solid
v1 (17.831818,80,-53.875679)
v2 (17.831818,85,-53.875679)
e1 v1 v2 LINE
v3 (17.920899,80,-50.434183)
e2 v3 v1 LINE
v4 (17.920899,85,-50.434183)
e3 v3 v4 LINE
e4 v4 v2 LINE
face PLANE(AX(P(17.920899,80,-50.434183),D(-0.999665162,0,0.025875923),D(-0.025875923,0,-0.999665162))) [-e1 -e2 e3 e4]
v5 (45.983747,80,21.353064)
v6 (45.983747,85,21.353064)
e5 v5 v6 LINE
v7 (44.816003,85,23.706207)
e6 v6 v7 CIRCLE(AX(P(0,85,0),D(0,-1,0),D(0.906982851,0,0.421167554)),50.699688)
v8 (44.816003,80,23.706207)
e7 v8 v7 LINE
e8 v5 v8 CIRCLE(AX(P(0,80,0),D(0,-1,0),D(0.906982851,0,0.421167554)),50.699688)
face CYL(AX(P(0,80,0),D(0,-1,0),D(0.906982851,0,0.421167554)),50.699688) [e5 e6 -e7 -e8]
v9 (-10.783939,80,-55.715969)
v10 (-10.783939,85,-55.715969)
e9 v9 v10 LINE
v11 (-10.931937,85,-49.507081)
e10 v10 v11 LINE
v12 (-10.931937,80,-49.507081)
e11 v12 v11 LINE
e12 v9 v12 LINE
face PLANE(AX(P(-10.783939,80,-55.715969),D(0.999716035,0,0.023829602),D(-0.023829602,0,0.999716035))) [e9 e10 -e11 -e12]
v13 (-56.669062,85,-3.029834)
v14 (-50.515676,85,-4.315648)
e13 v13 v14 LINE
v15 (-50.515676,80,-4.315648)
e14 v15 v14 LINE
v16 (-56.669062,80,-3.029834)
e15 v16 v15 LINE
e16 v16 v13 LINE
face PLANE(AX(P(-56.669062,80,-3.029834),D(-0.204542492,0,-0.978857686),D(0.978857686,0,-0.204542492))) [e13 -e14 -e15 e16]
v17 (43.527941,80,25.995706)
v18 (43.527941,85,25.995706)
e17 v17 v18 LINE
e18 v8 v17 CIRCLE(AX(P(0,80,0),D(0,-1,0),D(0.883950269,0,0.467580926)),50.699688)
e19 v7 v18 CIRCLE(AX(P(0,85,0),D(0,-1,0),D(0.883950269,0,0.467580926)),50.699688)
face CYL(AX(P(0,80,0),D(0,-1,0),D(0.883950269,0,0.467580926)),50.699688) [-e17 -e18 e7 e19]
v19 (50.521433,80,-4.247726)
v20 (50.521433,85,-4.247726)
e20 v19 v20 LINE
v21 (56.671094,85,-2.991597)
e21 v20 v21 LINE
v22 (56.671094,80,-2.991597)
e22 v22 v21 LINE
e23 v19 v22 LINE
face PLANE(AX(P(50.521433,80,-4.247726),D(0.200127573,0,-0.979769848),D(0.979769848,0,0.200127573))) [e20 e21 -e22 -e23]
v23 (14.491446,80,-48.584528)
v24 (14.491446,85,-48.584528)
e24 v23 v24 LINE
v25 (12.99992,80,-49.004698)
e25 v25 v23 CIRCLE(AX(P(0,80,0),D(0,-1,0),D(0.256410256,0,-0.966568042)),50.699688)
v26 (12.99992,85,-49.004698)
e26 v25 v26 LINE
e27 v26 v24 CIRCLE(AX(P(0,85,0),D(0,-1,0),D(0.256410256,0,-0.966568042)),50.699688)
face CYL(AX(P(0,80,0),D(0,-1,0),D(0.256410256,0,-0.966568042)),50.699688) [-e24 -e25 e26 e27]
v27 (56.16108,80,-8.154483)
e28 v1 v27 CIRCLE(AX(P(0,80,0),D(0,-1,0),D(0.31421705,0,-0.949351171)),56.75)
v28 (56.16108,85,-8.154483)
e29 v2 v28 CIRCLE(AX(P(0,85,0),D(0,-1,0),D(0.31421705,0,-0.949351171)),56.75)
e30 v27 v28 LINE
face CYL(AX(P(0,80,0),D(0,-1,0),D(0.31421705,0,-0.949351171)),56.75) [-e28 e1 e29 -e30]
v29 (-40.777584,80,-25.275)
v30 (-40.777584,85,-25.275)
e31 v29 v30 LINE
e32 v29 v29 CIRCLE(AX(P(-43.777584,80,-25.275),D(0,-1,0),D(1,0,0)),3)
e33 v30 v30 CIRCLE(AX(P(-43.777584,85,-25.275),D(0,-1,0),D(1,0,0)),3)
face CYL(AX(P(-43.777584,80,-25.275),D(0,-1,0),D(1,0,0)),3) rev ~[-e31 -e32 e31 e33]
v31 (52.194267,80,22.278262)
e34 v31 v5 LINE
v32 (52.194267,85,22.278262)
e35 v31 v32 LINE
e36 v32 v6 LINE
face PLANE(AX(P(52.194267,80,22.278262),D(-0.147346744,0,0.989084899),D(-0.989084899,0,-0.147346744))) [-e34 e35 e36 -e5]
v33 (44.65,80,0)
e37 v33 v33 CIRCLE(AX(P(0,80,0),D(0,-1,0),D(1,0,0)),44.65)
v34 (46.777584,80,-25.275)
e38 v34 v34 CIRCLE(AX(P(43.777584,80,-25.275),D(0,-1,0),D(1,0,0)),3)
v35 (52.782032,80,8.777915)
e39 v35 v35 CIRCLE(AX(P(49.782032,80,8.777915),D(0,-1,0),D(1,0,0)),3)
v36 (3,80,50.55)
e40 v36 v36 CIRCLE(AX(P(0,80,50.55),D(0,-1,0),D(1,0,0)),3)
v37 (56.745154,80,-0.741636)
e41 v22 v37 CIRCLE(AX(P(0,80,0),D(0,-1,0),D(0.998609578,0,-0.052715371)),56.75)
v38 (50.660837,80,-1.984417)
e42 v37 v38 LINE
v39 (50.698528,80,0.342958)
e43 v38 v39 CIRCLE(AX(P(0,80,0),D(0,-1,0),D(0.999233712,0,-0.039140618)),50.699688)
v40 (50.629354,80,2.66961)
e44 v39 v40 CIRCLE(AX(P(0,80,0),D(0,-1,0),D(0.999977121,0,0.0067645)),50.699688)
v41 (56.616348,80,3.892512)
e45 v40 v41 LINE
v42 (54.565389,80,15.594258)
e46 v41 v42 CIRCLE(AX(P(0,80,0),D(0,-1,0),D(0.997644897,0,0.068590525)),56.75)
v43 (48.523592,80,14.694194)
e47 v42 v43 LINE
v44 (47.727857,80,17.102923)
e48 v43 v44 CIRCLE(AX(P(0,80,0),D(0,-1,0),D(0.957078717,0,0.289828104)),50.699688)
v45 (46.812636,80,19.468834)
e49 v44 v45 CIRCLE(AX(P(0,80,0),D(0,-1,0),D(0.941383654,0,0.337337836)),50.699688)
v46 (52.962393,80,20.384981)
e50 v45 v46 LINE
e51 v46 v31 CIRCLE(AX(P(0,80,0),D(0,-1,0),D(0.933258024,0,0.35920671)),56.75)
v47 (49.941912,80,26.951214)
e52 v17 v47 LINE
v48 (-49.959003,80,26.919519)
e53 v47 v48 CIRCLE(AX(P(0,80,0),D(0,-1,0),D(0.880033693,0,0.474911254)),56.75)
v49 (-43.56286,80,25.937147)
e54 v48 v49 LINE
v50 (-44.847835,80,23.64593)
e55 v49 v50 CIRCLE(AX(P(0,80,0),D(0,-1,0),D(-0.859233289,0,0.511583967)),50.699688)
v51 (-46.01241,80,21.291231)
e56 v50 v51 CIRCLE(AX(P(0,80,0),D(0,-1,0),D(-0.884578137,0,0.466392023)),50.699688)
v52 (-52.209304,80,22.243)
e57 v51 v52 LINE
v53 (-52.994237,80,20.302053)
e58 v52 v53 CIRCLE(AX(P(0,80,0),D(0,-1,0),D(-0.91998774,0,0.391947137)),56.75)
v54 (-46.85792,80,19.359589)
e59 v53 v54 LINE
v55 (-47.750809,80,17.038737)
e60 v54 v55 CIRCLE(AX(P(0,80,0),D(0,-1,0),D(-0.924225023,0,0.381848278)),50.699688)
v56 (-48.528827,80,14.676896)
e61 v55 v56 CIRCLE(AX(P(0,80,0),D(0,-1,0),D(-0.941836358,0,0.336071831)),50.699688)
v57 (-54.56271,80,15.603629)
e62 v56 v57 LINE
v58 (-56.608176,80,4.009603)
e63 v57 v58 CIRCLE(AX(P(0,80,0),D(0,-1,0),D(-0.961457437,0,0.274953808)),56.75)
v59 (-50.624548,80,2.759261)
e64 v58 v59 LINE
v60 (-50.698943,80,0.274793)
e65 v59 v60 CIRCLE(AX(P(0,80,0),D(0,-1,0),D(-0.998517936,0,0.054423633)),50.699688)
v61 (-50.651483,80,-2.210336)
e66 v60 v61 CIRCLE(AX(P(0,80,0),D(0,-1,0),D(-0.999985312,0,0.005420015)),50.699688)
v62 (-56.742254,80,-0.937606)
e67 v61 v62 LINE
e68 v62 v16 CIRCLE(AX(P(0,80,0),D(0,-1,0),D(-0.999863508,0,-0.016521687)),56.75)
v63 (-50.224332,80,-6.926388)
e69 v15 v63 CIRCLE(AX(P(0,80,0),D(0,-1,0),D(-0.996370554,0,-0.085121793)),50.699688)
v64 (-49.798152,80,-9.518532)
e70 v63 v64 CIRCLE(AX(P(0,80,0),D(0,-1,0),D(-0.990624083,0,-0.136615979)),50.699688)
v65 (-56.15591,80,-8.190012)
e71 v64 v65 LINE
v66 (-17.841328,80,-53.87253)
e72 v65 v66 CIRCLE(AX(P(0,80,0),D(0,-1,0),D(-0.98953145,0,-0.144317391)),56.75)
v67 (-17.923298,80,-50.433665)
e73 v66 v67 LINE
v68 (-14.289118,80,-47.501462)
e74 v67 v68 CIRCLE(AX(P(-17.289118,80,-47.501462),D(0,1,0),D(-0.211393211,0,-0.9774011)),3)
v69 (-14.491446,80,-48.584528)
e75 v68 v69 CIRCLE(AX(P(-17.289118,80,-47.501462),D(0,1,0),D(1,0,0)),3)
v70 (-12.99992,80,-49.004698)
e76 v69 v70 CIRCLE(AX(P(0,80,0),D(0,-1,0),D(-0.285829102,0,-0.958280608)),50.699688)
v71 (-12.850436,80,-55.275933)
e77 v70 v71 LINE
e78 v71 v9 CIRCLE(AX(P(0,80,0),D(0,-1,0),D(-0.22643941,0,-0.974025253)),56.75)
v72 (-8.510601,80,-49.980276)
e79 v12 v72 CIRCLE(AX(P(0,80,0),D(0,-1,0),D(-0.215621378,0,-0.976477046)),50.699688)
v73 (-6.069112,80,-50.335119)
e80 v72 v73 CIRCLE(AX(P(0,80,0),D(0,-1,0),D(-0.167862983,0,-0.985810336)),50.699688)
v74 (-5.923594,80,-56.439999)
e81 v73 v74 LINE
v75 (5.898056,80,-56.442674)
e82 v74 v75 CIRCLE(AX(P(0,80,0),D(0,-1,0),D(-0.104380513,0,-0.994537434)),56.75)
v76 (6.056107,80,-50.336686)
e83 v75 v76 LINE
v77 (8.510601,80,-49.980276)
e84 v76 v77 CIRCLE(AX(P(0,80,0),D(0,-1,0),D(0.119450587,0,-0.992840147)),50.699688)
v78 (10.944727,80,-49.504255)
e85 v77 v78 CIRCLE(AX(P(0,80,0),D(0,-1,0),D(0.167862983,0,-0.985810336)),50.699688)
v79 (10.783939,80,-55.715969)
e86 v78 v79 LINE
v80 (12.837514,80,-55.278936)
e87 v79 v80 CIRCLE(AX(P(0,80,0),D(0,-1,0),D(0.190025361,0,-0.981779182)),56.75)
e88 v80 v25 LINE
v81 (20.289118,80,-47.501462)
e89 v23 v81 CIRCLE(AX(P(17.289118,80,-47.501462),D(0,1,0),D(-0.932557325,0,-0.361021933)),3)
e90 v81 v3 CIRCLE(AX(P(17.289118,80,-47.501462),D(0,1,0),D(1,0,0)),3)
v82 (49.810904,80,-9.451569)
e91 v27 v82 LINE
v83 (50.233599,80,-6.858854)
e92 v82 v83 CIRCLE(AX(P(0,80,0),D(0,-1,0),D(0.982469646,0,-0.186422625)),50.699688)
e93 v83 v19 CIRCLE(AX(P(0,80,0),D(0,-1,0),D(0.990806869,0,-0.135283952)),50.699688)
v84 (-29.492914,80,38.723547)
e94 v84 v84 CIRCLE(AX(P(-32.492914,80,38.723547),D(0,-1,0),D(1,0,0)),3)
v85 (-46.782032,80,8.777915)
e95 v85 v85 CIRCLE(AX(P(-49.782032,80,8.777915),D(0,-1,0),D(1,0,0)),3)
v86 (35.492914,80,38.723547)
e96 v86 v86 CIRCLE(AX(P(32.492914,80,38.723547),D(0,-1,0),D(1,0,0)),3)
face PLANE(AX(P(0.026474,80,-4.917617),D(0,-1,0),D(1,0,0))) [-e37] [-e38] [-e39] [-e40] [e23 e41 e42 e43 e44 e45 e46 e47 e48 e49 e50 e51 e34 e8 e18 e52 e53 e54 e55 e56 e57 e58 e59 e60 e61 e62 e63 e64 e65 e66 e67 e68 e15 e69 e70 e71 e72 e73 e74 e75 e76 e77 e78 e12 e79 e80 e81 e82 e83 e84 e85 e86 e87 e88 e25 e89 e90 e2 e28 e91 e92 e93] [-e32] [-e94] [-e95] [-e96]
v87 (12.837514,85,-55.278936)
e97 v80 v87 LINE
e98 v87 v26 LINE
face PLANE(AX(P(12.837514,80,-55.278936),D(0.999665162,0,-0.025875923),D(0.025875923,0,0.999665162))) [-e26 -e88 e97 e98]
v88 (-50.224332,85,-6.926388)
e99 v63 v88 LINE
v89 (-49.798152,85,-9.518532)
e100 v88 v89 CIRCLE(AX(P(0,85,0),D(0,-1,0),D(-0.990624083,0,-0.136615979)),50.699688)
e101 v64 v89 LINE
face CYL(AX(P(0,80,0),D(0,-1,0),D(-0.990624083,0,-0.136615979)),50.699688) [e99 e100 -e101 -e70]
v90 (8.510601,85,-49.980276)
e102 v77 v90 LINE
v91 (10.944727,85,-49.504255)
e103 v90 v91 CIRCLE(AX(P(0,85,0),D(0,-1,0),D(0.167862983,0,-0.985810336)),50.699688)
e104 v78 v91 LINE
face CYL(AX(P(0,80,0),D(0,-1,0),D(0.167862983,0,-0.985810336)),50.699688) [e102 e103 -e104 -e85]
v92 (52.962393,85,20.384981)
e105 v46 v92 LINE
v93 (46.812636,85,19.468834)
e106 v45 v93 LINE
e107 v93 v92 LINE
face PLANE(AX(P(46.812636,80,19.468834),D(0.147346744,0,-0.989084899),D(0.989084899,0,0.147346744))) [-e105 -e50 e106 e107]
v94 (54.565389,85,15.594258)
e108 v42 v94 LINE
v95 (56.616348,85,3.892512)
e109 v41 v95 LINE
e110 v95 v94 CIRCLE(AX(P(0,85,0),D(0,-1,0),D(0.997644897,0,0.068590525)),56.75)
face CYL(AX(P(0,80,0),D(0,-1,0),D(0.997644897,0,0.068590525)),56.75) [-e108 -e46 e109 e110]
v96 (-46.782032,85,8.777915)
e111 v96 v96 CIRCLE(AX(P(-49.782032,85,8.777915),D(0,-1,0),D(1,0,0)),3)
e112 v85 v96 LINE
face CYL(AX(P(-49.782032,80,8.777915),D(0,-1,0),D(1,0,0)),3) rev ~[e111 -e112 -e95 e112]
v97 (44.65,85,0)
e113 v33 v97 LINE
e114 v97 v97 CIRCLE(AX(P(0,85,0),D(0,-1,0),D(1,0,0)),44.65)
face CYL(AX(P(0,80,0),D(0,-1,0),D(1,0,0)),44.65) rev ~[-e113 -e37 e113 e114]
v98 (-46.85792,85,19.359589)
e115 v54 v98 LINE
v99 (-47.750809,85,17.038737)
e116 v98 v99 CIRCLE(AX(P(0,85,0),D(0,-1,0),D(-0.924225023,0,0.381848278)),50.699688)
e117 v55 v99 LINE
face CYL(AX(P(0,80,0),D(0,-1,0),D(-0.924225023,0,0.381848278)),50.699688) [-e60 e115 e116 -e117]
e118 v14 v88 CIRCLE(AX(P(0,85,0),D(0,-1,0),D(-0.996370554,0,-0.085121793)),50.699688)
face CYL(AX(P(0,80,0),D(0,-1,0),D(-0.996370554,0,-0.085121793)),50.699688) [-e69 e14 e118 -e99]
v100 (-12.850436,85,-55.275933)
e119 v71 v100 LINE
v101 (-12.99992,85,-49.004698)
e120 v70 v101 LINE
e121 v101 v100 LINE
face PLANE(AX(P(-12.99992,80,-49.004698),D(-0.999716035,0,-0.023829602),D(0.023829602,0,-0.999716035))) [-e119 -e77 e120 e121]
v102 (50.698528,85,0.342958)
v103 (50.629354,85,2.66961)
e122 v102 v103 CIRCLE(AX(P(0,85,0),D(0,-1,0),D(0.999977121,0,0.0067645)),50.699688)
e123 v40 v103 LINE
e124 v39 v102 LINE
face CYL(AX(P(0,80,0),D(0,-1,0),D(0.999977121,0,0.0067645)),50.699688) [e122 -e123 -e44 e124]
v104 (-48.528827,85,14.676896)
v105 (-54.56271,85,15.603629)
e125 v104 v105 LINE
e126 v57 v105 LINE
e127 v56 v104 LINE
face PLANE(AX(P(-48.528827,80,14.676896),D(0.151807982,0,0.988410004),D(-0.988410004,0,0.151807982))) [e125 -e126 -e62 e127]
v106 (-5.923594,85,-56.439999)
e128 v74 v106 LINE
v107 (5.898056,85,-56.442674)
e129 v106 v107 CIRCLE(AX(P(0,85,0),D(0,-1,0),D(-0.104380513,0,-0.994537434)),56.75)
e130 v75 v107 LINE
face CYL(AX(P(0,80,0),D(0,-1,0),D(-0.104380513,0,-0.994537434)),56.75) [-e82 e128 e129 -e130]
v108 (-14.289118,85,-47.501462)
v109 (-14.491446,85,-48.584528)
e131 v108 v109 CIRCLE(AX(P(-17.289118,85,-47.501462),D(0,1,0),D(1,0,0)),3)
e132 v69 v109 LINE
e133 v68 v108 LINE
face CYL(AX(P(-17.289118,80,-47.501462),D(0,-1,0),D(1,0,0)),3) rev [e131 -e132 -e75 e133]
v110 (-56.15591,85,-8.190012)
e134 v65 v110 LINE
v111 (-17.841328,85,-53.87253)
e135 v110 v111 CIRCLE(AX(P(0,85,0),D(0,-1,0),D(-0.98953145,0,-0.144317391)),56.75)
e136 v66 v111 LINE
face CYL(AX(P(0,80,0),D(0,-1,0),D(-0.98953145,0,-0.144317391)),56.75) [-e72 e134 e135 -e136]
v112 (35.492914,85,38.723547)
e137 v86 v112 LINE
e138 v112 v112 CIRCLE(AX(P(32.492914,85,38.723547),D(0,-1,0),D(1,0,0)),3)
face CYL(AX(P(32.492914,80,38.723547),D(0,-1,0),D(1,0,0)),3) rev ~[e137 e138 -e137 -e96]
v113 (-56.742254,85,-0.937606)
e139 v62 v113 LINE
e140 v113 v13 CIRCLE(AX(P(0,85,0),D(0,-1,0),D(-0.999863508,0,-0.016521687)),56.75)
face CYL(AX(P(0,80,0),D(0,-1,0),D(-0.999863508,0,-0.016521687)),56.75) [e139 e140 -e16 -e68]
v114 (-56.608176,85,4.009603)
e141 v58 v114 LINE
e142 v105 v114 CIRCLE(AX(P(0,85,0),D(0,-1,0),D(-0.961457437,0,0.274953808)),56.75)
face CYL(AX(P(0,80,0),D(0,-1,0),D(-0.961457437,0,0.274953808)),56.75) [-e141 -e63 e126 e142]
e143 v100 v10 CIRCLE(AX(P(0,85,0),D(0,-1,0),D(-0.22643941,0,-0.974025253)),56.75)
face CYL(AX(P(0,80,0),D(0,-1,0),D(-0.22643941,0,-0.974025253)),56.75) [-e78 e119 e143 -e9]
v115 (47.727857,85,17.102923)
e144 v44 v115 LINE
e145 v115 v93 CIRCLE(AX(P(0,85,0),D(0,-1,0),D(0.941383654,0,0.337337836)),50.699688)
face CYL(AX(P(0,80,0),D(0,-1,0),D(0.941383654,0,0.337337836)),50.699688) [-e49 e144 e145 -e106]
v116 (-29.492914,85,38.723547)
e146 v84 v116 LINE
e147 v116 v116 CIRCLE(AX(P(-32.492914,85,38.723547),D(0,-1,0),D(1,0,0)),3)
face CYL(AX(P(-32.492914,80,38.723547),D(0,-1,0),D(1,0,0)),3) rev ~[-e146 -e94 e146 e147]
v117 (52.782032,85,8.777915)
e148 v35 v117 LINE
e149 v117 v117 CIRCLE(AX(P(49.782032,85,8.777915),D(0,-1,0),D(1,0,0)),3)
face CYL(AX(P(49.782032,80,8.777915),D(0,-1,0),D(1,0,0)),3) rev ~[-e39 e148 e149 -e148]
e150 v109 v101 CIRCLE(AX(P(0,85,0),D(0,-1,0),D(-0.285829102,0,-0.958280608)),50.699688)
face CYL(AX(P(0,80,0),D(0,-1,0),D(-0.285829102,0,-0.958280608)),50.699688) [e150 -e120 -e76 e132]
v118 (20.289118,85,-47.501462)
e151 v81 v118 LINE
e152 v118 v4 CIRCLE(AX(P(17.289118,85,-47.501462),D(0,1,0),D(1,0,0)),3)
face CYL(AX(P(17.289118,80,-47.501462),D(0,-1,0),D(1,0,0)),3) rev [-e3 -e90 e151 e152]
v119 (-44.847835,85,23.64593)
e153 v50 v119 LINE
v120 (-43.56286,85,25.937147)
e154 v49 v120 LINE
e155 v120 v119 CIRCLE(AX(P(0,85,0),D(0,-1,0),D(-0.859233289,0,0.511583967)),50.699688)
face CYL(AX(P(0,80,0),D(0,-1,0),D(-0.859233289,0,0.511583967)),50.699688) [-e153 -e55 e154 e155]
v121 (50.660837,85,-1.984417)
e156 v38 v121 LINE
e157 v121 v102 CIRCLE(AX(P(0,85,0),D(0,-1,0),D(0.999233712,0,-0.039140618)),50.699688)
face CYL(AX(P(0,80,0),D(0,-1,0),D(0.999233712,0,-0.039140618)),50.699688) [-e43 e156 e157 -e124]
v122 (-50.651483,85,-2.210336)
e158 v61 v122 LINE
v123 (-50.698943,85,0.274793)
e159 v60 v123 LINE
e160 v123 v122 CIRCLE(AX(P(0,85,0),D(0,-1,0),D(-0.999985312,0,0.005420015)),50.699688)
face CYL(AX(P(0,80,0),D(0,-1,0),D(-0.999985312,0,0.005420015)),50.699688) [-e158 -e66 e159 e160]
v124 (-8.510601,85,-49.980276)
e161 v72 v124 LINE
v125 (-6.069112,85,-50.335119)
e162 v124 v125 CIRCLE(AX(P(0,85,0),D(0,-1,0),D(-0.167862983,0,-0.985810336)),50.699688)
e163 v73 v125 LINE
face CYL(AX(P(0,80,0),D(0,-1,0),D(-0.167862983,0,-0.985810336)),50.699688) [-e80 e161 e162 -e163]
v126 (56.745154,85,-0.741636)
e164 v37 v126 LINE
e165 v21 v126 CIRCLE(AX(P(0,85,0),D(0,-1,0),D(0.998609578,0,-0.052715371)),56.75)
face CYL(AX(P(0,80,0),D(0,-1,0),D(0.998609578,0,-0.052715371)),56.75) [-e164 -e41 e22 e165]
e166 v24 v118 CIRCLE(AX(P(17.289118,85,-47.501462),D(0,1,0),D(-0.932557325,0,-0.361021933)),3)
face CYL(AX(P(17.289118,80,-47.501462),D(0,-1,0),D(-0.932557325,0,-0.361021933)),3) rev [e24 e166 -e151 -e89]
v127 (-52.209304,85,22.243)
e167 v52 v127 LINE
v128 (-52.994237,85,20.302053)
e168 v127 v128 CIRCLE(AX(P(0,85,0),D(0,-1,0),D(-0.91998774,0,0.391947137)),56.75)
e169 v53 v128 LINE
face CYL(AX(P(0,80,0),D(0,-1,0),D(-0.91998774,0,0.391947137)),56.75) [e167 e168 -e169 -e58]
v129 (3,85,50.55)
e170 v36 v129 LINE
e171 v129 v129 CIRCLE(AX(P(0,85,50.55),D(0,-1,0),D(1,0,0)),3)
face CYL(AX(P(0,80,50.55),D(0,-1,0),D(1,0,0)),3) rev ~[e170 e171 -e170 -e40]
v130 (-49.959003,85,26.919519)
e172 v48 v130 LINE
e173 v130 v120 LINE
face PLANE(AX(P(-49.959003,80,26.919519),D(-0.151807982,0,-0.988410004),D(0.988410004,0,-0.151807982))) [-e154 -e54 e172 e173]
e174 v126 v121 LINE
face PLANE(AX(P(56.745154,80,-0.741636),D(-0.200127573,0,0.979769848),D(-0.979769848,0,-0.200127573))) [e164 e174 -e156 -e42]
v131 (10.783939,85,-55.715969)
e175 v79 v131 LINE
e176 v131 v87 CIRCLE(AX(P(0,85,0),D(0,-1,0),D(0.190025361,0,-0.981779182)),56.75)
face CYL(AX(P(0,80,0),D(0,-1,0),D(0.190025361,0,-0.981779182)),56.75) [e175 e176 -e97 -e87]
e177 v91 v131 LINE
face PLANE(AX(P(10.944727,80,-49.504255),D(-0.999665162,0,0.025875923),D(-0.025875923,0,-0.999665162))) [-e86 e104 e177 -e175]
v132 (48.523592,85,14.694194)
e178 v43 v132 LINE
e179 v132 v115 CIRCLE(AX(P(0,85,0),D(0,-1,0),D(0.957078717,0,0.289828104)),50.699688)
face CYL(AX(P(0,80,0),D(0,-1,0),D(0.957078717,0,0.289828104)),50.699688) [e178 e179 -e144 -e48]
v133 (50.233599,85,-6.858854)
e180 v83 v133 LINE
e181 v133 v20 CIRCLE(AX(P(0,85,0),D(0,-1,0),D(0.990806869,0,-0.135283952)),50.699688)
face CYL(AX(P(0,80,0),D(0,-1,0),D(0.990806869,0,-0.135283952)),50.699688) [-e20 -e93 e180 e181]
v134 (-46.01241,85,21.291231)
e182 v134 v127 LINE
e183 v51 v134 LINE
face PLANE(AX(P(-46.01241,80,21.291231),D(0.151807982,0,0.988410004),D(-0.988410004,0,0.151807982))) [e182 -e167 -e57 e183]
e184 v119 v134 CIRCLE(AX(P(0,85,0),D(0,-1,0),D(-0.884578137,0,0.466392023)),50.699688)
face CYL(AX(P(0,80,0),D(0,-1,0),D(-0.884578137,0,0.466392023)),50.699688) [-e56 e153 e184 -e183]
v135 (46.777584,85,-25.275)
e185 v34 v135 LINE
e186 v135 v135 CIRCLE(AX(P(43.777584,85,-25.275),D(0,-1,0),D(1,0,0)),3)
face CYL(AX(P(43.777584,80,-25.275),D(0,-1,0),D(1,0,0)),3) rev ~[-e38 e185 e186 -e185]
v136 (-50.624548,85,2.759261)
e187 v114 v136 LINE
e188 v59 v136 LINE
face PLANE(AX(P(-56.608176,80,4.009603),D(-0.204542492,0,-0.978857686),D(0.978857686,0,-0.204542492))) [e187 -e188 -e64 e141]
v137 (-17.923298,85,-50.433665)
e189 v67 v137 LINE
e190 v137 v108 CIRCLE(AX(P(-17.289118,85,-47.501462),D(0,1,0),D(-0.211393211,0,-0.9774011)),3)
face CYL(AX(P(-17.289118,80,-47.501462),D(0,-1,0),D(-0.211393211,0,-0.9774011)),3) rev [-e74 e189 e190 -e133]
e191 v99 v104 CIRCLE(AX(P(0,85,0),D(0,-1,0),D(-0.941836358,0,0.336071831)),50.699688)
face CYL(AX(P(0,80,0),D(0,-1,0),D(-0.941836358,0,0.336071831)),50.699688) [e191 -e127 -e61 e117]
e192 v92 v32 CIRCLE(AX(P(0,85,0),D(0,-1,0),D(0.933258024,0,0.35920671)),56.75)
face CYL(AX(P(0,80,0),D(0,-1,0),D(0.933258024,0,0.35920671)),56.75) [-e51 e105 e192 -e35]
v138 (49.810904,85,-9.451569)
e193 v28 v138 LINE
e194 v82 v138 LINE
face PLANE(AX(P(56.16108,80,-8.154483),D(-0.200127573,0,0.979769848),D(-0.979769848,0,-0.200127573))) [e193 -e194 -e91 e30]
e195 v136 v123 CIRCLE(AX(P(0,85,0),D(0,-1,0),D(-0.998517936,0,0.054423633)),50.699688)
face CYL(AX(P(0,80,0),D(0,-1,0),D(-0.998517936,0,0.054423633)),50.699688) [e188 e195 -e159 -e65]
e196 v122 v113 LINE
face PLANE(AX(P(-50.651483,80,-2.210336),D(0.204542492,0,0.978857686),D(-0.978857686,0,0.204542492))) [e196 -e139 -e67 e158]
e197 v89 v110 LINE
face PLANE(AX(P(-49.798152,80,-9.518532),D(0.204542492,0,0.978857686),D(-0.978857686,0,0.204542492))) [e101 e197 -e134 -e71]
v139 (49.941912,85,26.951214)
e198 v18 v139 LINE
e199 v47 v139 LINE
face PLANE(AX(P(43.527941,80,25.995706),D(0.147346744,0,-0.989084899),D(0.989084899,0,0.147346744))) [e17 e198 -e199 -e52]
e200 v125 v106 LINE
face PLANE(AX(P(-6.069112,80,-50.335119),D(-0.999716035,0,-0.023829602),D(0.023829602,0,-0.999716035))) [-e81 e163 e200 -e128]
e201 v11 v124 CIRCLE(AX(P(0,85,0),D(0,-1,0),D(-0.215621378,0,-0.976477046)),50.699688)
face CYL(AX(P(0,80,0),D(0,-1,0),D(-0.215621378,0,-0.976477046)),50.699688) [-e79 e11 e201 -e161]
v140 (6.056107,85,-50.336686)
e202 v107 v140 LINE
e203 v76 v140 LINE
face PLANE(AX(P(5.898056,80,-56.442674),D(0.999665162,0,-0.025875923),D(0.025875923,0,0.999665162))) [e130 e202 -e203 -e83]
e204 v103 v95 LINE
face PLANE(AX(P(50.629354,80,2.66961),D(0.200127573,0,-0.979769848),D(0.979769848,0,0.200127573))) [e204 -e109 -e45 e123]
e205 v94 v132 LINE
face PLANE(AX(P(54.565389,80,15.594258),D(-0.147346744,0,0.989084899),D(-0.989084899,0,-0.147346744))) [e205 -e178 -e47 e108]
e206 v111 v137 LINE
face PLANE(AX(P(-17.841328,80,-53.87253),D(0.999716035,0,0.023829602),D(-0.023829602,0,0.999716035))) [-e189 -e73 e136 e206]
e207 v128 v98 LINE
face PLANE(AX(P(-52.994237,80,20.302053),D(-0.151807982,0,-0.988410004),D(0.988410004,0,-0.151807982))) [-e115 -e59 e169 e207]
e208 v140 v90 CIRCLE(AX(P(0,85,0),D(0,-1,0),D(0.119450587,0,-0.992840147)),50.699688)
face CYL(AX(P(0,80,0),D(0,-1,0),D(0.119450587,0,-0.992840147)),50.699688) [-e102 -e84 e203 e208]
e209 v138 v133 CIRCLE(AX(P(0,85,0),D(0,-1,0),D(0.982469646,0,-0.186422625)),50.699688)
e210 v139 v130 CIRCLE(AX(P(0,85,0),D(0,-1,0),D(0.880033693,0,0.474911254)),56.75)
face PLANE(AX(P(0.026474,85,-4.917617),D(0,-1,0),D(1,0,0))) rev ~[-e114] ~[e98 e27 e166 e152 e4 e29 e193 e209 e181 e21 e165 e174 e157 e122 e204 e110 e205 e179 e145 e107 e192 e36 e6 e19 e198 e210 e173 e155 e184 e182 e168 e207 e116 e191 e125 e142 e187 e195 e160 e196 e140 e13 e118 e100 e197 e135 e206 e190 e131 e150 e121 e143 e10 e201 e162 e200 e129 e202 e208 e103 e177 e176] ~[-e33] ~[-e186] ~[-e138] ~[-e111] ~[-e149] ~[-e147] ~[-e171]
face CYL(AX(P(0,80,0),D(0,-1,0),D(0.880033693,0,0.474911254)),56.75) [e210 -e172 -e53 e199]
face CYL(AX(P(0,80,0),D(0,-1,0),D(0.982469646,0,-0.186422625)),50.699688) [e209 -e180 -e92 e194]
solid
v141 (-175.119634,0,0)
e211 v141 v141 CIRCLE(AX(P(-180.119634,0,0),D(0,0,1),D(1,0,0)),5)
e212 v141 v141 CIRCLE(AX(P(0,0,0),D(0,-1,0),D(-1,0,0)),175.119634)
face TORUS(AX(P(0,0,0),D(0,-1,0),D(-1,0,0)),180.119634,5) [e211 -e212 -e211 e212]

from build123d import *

# Parameters (mm, degrees)
F1_R     = 5
F3_START = -80
F0_R     = 3
F0_R_2   = 44.65
F3_DEPTH = 5


# Not quite as in the source:
# - the program builds the solid bodies; features that only make, move or delete a surface that nothing else refers to are left out


with BuildPart() as f2:
    # F1 (on Top) → F2 (revolve)
    with BuildSketch(Plane.XY):
        with Locations((-180.1196336746, 0)):
            Circle(F1_R)
    revolve(axis=Axis((0, 0, 0), (0, -1, 0)))


with BuildPart() as f3:
    # F0 (on Front) → F3 (new body)
    with BuildSketch(Plane.XZ.offset(F3_START)):
        with BuildLine():
            ThreePointArc((49.8109044328, -9.451568881), (50.0390468759, -8.1579496494), (50.2335990607, -6.8588541417))
            ThreePointArc((50.2335990607, -6.8588541417), (50.3944303881, -5.5551544159), (50.5214328951, -4.247725621))
            Line((50.5214328951, -4.247725621), (56.6710935634, -2.9915972871))
            ThreePointArc((56.6710935634, -2.9915972871), (56.7192812989, -1.8669839158), (56.7451537669, -0.7416360104))
            Line((56.7451537669, -0.7416360104), (50.6608373732, -1.9844171372))
            ThreePointArc((50.6608373732, -1.9844171372), (50.6930409681, -0.8209458797), (50.6985279324, 0.342958039))
            ThreePointArc((50.6985279324, 0.342958039), (50.6772953744, 1.5066812093), (50.6293544842, 2.669610317))
            Line((50.6293544842, 2.669610317), (56.6163478884, 3.8925122714))
            ThreePointArc((56.6163478884, 3.8925122714), (55.8979189272, 9.7972016216), (54.5653885403, 15.5942577074))
            Line((54.5653885403, 15.5942577074), (48.5235922547, 14.6941944125))
            ThreePointArc((48.5235922547, 14.6941944125), (48.1407923431, 15.9035363146), (47.7278574814, 17.1029229947))
            ThreePointArc((47.7278574814, 17.1029229947), (47.2850461567, 18.2916036663), (46.812635558, 19.4688342447))
            Line((46.812635558, 19.4688342447), (52.962392865, 20.384980795))
            ThreePointArc((52.962392865, 20.384980795), (52.5868512377, 21.3350785541), (52.1942673065, 22.2782620583))
            Line((52.1942673065, 22.2782620583), (45.9837474764, 21.353063545))
            ThreePointArc((45.9837474764, 21.353063545), (45.4151184326, 22.537199748), (44.8160027703, 23.7062070021))
            ThreePointArc((44.8160027703, 23.7062070021), (44.1868026685, 24.8593005667), (43.5279405017, 25.9957063842))
            Line((43.5279405017, 25.9957063842), (49.9419120736, 26.9512136727))
            ThreePointArc((49.9419120736, 26.9512136727), (-0.0180046804, 56.7499971439), (-49.9590032696, 26.9195187979))
            Line((-49.9590032696, 26.9195187979), (-43.5628595995, 25.9371474577))
            ThreePointArc((-43.5628595995, 25.9371474577), (-44.2201896339, 24.7998625696), (-44.847835498, 23.6459300066))
            ThreePointArc((-44.847835498, 23.6459300066), (-45.4453758651, 22.4761243815), (-46.0124096177, 21.2912309626))
            Line((-46.0124096177, 21.2912309626), (-52.2093042453, 22.2430000275))
            ThreePointArc((-52.2093042453, 22.2430000275), (-52.6107220584, 21.2761468431), (-52.9942367056, 20.3020534921))
            Line((-52.9942367056, 20.3020534921), (-46.8579202223, 19.3595885072))
            ThreePointArc((-46.8579202223, 19.3595885072), (-47.3185959, 18.2046377822), (-47.7508093952, 17.0387369495))
            ThreePointArc((-47.7508093952, 17.0387369495), (-48.154300731, 15.8625872996), (-48.5288272071, 14.6768962876))
            Line((-48.5288272071, 14.6768962876), (-54.5627095565, 15.6036286119))
            ThreePointArc((-54.5627095565, 15.6036286119), (-55.8869108783, 9.8598018482), (-56.6081759757, 4.0096025617))
            Line((-56.6081759757, 4.0096025617), (-50.6245477239, 2.7592612205))
            ThreePointArc((-50.6245477239, 2.7592612205), (-50.6769730719, 1.517483112), (-50.6989432189, 0.2747930459))
            ThreePointArc((-50.6989432189, 0.2747930459), (-50.6904449614, -0.9680621618), (-50.6514834065, -2.2103355958))
            Line((-50.6514834065, -2.2103355958), (-56.7422540571, -0.9376057363))
            ThreePointArc((-56.7422540571, -0.9376057363), (-56.7153067125, -1.9840575867), (-56.669062139, -3.029834367))
            Line((-56.669062139, -3.029834367), (-50.5156761211, -4.3156483586))
            ThreePointArc((-50.5156761211, -4.3156483586), (-50.3869158777, -5.6229052157), (-50.2243318582, -6.9263875238))
            ThreePointArc((-50.2243318582, -6.9263875238), (-50.0280332022, -8.2252202799), (-49.7981516812, -9.5185316024))
            Line((-49.7981516812, -9.5185316024), (-56.1559097911, -8.1900119371))
            ThreePointArc((-56.1559097911, -8.1900119371), (-43.4812708484, -36.4683641723), (-17.8413278177, -53.8725303072))
            Line((-17.8413278177, -53.8725303072), (-17.9232978779, -50.4336652809))
            ThreePointArc((-17.9232978779, -50.4336652809), (-19.1729257063, -45.1666666044), (-14.2891182451, -47.5014619807))
            ThreePointArc((-14.2891182451, -47.5014619807), (-14.3401340199, -48.0523630966), (-14.4914462714, -48.5845277809))
            ThreePointArc((-14.4914462714, -48.5845277809), (-13.7472884724, -48.8003116218), (-12.9999199783, -49.004698094))
            Line((-12.9999199783, -49.004698094), (-12.8504364982, -55.2759331157))
            ThreePointArc((-12.8504364982, -55.2759331157), (-11.8192358816, -55.5055687582), (-10.7839392307, -55.7159685788))
            Line((-10.7839392307, -55.7159685788), (-10.9319365624, -49.5070814907))
            ThreePointArc((-10.9319365624, -49.5070814907), (-9.7241474559, -49.7584094499), (-8.5106008637, -49.9802763865))
            ThreePointArc((-8.5106008637, -49.9802763865), (-7.2920153041, -50.1725509371), (-6.0691122787, -50.3351192596))
            Line((-6.0691122787, -50.3351192596), (-5.9235940949, -56.4399994064))
            ThreePointArc((-5.9235940949, -56.4399994064), (-0.0128386472, -56.7499985477), (5.8980564587, -56.4426738382))
            Line((5.8980564587, -56.4426738382), (6.0561074621, -50.3366855994))
            ThreePointArc((6.0561074621, -50.3366855994), (7.2855339368, -50.1734925034), (8.5106008637, -49.9802763865))
            ThreePointArc((8.5106008637, -49.9802763865), (9.7305751823, -49.7571528662), (10.9447268793, -49.5042554561))
            Line((10.9447268793, -49.5042554561), (10.7839392307, -55.7159685788))
            ThreePointArc((10.7839392307, -55.7159685788), (11.8127478396, -55.5069499115), (12.837513908, -55.278935741))
            Line((12.837513908, -55.278935741), (12.9999199783, -49.004698094))
            ThreePointArc((12.9999199783, -49.004698094), (13.7472884724, -48.8003116218), (14.4914462714, -48.5845277809))
            ThreePointArc((14.4914462714, -48.5845277809), (16.7382171293, -44.5524777555), (20.2891182451, -47.5014619807))
            ThreePointArc((20.2891182451, -47.5014619807), (19.6231430112, -49.3862241385), (17.9208993176, -50.434183017))
            Line((17.9208993176, -50.434183017), (17.831817606, -53.8756789365))
            ThreePointArc((17.831817606, -53.8756789365), (43.489586701, -36.4584468755), (56.1610799396, -8.1544834304))
            Line((56.1610799396, -8.1544834304), (49.8109044328, -9.451568881))
        make_face()
        with Locations((-43.7775841613, -25.275)):
            Circle(F0_R, mode=Mode.SUBTRACT)
        with Locations((43.7775841613, -25.275)):
            Circle(F0_R, mode=Mode.SUBTRACT)
        with Locations((-49.7820319148, 8.7779153811)):
            Circle(F0_R, mode=Mode.SUBTRACT)
        with Locations((-32.4929136697, 38.7235465997)):
            Circle(F0_R, mode=Mode.SUBTRACT)
        Circle(F0_R_2, mode=Mode.SUBTRACT)
        with Locations((32.4929136697, 38.7235465997)):
            Circle(F0_R, mode=Mode.SUBTRACT)
        with Locations((49.7820319148, 8.7779153811)):
            Circle(F0_R, mode=Mode.SUBTRACT)
        with Locations((0, 50.55)):
            Circle(F0_R, mode=Mode.SUBTRACT)
    extrude(amount=-F3_DEPTH)


solid = Compound([f2.part, f3.part])
